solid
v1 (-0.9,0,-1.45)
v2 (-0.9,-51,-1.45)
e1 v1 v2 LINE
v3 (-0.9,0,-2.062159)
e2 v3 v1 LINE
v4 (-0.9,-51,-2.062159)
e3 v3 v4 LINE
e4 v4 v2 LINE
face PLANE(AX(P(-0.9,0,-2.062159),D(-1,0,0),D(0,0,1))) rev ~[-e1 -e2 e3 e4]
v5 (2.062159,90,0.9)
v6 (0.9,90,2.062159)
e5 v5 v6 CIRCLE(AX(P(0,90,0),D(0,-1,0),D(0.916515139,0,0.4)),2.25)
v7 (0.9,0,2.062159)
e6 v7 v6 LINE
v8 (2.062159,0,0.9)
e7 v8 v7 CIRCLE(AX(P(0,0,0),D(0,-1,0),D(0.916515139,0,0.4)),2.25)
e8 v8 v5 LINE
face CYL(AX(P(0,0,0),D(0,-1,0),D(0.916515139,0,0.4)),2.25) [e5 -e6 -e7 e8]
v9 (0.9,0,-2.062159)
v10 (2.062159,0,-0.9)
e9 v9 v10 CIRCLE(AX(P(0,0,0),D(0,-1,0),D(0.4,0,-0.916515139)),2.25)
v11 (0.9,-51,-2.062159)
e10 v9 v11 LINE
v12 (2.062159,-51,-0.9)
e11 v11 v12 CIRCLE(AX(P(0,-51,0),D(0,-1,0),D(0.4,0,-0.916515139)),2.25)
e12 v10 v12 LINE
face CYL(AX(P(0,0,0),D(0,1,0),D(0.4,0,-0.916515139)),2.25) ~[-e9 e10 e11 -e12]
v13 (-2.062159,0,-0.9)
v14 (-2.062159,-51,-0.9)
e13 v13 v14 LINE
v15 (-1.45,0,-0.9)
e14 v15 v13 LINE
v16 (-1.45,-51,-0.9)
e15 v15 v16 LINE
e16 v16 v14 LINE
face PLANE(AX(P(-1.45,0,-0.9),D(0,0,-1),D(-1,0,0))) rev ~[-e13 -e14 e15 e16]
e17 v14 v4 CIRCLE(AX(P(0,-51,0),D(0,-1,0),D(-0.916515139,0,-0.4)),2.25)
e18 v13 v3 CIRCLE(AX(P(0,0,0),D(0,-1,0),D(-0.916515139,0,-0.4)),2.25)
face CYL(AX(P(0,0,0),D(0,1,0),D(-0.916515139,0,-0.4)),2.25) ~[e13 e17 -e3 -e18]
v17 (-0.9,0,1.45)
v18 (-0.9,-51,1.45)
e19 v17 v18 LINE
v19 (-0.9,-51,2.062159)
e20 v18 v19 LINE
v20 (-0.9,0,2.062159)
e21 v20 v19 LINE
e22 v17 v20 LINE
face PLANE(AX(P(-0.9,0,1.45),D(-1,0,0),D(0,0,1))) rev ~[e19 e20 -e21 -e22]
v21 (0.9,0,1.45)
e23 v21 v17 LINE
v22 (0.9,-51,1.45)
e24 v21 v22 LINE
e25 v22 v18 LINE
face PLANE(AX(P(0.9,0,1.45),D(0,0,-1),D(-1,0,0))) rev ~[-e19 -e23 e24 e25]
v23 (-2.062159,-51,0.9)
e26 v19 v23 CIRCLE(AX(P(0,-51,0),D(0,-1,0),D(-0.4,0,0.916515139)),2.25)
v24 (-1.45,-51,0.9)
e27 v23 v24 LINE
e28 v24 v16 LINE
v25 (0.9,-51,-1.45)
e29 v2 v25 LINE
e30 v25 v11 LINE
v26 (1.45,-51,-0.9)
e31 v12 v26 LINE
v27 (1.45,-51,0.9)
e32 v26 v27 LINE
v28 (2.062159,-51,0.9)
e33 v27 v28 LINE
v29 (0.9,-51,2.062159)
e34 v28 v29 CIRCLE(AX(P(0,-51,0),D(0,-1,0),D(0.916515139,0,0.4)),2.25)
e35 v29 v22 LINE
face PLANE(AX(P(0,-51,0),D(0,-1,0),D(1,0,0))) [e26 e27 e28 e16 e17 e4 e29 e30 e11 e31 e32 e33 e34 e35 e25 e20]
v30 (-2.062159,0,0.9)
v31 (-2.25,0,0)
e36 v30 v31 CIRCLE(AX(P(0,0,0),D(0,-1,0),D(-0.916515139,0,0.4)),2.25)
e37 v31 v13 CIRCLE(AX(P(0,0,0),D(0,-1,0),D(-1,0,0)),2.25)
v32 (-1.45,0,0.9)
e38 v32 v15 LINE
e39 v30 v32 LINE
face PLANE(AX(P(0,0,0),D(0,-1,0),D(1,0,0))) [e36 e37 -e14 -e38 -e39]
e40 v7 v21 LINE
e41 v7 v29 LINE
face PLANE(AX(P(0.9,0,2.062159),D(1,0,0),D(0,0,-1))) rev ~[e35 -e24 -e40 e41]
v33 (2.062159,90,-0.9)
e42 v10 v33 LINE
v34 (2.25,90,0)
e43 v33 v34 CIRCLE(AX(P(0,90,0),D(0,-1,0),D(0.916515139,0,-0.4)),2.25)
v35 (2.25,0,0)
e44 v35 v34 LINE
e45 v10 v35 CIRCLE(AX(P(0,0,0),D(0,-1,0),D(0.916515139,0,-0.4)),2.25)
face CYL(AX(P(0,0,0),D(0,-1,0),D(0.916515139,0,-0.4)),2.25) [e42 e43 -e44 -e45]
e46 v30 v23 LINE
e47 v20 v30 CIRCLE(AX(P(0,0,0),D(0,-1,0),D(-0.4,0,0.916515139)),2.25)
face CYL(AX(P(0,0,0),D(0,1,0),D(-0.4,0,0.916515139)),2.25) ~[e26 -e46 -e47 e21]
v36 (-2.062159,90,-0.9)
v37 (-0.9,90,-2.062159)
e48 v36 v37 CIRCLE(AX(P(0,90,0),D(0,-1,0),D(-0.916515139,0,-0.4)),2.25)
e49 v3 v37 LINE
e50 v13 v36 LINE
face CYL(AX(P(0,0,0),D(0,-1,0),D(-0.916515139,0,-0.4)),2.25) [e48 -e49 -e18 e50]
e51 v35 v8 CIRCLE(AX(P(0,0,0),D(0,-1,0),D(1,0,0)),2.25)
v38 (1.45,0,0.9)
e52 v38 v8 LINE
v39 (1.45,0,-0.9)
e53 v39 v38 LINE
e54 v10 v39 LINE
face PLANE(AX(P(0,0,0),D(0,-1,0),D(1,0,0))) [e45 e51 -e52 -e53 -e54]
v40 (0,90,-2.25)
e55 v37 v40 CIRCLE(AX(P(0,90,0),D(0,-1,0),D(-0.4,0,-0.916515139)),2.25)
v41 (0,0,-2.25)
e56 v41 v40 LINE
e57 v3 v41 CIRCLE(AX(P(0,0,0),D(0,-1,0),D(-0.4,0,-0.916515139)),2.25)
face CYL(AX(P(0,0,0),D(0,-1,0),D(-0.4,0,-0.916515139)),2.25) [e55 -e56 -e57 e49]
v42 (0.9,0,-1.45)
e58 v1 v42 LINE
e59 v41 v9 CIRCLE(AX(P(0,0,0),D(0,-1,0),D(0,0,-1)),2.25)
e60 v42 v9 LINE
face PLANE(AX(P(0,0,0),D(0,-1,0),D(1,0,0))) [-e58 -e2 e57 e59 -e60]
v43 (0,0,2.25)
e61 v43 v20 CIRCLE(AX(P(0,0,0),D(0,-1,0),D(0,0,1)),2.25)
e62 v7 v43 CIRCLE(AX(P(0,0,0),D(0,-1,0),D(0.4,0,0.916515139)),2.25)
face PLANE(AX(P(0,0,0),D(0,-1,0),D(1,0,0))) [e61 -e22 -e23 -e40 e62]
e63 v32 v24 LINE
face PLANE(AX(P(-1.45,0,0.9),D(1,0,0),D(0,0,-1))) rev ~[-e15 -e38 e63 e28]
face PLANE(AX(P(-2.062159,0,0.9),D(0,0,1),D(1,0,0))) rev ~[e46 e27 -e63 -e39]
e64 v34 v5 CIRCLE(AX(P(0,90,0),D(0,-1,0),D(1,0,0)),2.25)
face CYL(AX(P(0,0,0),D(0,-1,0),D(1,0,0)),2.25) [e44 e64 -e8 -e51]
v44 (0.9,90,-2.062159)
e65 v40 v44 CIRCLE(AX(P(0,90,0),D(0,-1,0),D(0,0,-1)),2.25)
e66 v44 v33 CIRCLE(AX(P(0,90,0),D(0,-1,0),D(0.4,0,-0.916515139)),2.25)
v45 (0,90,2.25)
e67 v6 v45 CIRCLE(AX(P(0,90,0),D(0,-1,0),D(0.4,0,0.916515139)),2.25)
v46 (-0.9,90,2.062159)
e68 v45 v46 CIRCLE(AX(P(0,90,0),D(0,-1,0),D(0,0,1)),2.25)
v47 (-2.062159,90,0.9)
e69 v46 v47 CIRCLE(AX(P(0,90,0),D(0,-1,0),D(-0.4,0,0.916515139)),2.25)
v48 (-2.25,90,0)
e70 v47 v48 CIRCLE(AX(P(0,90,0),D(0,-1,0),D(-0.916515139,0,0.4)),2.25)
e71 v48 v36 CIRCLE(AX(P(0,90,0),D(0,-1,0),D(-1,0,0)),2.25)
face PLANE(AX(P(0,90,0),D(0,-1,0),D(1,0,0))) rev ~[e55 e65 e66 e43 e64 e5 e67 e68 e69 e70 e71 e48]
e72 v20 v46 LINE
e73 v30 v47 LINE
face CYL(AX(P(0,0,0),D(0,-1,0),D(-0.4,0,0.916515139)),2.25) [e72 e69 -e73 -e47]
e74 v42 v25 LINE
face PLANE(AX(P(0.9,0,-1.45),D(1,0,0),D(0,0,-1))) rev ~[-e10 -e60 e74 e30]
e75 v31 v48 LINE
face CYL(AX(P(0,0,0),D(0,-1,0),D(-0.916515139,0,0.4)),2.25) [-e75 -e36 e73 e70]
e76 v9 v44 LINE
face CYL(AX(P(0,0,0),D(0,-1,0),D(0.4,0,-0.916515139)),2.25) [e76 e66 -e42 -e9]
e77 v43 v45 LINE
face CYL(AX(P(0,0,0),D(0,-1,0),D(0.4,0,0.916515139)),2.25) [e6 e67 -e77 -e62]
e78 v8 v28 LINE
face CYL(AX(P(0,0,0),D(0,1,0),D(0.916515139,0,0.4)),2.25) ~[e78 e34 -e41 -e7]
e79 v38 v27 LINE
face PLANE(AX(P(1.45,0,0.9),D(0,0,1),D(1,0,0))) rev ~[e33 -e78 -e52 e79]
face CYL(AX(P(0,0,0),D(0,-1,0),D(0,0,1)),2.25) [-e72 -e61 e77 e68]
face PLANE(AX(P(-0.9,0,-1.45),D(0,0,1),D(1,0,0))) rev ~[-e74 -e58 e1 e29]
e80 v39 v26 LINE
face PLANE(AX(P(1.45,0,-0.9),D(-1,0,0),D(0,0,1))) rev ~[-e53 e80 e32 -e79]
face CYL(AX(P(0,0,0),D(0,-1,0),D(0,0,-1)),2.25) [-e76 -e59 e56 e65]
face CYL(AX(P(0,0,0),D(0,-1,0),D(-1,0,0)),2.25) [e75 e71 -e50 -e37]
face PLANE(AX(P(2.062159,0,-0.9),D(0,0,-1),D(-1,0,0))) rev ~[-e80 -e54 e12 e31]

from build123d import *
from build123d import SkipClean  # not in build123d's __all__

# Parameters (mm, degrees)
F1_DEPTH = 51
F2_DEPTH = 90


with BuildPart() as f1:
    # F0 (on Front) → F1 (new body)
    with BuildSketch(Plane.XZ):
        with BuildLine():
            Line((1.45, 0.9), (2.0621590627, 0.9))
            ThreePointArc((2.0621590627, 0.9), (1.5909902577, 1.5909902577), (0.9, 2.0621590627))
            Line((0.9, 2.0621590627), (0.9, 1.45))
            Line((0.9, 1.45), (0, 1.45))
            Line((0, 1.45), (-0.9, 1.45))
            Line((-0.9, 1.45), (-0.9, 2.0621590627))
            ThreePointArc((-0.9, 2.0621590627), (-1.5909902577, 1.5909902577), (-2.0621590627, 0.9))
            Line((-2.0621590627, 0.9), (-1.45, 0.9))
            Line((-1.45, 0.9), (-1.45, 0))
            Line((-1.45, 0), (-1.45, -0.9))
            Line((-1.45, -0.9), (-2.0621590627, -0.9))
            ThreePointArc((-2.0621590627, -0.9), (-1.5909902577, -1.5909902577), (-0.9, -2.0621590627))
            Line((-0.9, -2.0621590627), (-0.9, -1.45))
            Line((-0.9, -1.45), (0, -1.45))
            Line((0, -1.45), (0.9, -1.45))
            Line((0.9, -1.45), (0.9, -2.0621590627))
            ThreePointArc((0.9, -2.0621590627), (1.5909902577, -1.5909902577), (2.0621590627, -0.9))
            Line((2.0621590627, -0.9), (1.45, -0.9))
            Line((1.45, -0.9), (1.45, 0))
            Line((1.45, 0), (1.45, 0.9))
        make_face()
    extrude(amount=F1_DEPTH)

    # F0 (on Front) → F2 (join)
    with BuildSketch(Plane.XZ):
        with BuildLine():
            Line((1.45, 0.9), (2.0621590627, 0.9))
            ThreePointArc((2.0621590627, 0.9), (1.5909902577, 1.5909902577), (0.9, 2.0621590627))
            Line((0.9, 2.0621590627), (0.9, 1.45))
            Line((0.9, 1.45), (0, 1.45))
            Line((0, 1.45), (-0.9, 1.45))
            Line((-0.9, 1.45), (-0.9, 2.0621590627))
            ThreePointArc((-0.9, 2.0621590627), (-1.5909902577, 1.5909902577), (-2.0621590627, 0.9))
            Line((-2.0621590627, 0.9), (-1.45, 0.9))
            Line((-1.45, 0.9), (-1.45, 0))
            Line((-1.45, 0), (-1.45, -0.9))
            Line((-1.45, -0.9), (-2.0621590627, -0.9))
            ThreePointArc((-2.0621590627, -0.9), (-1.5909902577, -1.5909902577), (-0.9, -2.0621590627))
            Line((-0.9, -2.0621590627), (-0.9, -1.45))
            Line((-0.9, -1.45), (0, -1.45))
            Line((0, -1.45), (0.9, -1.45))
            Line((0.9, -1.45), (0.9, -2.0621590627))
            ThreePointArc((0.9, -2.0621590627), (1.5909902577, -1.5909902577), (2.0621590627, -0.9))
            Line((2.0621590627, -0.9), (1.45, -0.9))
            Line((1.45, -0.9), (1.45, 0))
            Line((1.45, 0), (1.45, 0.9))
        make_face()
        with BuildLine():
            Line((0.9, 1.45), (0.9, 2.0621590627))
            ThreePointArc((0.9, 2.0621590627), (0.4596966983, 2.2025392041), (0, 2.25))
            ThreePointArc((0, 2.25), (-0.4596966983, 2.2025392041), (-0.9, 2.0621590627))
            Line((-0.9, 2.0621590627), (-0.9, 1.45))
            Line((-0.9, 1.45), (0, 1.45))
            Line((0, 1.45), (0.9, 1.45))
        make_face()
        with BuildLine():
            Line((-1.45, 0.9), (-2.0621590627, 0.9))
            ThreePointArc((-2.0621590627, 0.9), (-2.2025392041, 0.4596966983), (-2.25, 0))
            ThreePointArc((-2.25, 0), (-2.2025392041, -0.4596966983), (-2.0621590627, -0.9))
            Line((-2.0621590627, -0.9), (-1.45, -0.9))
            Line((-1.45, -0.9), (-1.45, 0))
            Line((-1.45, 0), (-1.45, 0.9))
        make_face()
        with BuildLine():
            ThreePointArc((0, -2.25), (0.4596966983, -2.2025392041), (0.9, -2.0621590627))
            Line((0.9, -2.0621590627), (0.9, -1.45))
            Line((0.9, -1.45), (0, -1.45))
            Line((0, -1.45), (-0.9, -1.45))
            Line((-0.9, -1.45), (-0.9, -2.0621590627))
            ThreePointArc((-0.9, -2.0621590627), (-0.4596966983, -2.2025392041), (0, -2.25))
        make_face()
        with BuildLine():
            ThreePointArc((2.0621590627, -0.9), (2.2025392041, -0.4596966983), (2.25, 0))
            ThreePointArc((2.25, 0), (2.2025392041, 0.4596966983), (2.0621590627, 0.9))
            Line((2.0621590627, 0.9), (1.45, 0.9))
            Line((1.45, 0.9), (1.45, 0))
            Line((1.45, 0), (1.45, -0.9))
            Line((1.45, -0.9), (2.0621590627, -0.9))
        make_face()
    with SkipClean():  # cleaning this boolean's faces spoils the solid; the shape is the same uncleaned
        extrude(amount=-F2_DEPTH)


solid = f1.part
